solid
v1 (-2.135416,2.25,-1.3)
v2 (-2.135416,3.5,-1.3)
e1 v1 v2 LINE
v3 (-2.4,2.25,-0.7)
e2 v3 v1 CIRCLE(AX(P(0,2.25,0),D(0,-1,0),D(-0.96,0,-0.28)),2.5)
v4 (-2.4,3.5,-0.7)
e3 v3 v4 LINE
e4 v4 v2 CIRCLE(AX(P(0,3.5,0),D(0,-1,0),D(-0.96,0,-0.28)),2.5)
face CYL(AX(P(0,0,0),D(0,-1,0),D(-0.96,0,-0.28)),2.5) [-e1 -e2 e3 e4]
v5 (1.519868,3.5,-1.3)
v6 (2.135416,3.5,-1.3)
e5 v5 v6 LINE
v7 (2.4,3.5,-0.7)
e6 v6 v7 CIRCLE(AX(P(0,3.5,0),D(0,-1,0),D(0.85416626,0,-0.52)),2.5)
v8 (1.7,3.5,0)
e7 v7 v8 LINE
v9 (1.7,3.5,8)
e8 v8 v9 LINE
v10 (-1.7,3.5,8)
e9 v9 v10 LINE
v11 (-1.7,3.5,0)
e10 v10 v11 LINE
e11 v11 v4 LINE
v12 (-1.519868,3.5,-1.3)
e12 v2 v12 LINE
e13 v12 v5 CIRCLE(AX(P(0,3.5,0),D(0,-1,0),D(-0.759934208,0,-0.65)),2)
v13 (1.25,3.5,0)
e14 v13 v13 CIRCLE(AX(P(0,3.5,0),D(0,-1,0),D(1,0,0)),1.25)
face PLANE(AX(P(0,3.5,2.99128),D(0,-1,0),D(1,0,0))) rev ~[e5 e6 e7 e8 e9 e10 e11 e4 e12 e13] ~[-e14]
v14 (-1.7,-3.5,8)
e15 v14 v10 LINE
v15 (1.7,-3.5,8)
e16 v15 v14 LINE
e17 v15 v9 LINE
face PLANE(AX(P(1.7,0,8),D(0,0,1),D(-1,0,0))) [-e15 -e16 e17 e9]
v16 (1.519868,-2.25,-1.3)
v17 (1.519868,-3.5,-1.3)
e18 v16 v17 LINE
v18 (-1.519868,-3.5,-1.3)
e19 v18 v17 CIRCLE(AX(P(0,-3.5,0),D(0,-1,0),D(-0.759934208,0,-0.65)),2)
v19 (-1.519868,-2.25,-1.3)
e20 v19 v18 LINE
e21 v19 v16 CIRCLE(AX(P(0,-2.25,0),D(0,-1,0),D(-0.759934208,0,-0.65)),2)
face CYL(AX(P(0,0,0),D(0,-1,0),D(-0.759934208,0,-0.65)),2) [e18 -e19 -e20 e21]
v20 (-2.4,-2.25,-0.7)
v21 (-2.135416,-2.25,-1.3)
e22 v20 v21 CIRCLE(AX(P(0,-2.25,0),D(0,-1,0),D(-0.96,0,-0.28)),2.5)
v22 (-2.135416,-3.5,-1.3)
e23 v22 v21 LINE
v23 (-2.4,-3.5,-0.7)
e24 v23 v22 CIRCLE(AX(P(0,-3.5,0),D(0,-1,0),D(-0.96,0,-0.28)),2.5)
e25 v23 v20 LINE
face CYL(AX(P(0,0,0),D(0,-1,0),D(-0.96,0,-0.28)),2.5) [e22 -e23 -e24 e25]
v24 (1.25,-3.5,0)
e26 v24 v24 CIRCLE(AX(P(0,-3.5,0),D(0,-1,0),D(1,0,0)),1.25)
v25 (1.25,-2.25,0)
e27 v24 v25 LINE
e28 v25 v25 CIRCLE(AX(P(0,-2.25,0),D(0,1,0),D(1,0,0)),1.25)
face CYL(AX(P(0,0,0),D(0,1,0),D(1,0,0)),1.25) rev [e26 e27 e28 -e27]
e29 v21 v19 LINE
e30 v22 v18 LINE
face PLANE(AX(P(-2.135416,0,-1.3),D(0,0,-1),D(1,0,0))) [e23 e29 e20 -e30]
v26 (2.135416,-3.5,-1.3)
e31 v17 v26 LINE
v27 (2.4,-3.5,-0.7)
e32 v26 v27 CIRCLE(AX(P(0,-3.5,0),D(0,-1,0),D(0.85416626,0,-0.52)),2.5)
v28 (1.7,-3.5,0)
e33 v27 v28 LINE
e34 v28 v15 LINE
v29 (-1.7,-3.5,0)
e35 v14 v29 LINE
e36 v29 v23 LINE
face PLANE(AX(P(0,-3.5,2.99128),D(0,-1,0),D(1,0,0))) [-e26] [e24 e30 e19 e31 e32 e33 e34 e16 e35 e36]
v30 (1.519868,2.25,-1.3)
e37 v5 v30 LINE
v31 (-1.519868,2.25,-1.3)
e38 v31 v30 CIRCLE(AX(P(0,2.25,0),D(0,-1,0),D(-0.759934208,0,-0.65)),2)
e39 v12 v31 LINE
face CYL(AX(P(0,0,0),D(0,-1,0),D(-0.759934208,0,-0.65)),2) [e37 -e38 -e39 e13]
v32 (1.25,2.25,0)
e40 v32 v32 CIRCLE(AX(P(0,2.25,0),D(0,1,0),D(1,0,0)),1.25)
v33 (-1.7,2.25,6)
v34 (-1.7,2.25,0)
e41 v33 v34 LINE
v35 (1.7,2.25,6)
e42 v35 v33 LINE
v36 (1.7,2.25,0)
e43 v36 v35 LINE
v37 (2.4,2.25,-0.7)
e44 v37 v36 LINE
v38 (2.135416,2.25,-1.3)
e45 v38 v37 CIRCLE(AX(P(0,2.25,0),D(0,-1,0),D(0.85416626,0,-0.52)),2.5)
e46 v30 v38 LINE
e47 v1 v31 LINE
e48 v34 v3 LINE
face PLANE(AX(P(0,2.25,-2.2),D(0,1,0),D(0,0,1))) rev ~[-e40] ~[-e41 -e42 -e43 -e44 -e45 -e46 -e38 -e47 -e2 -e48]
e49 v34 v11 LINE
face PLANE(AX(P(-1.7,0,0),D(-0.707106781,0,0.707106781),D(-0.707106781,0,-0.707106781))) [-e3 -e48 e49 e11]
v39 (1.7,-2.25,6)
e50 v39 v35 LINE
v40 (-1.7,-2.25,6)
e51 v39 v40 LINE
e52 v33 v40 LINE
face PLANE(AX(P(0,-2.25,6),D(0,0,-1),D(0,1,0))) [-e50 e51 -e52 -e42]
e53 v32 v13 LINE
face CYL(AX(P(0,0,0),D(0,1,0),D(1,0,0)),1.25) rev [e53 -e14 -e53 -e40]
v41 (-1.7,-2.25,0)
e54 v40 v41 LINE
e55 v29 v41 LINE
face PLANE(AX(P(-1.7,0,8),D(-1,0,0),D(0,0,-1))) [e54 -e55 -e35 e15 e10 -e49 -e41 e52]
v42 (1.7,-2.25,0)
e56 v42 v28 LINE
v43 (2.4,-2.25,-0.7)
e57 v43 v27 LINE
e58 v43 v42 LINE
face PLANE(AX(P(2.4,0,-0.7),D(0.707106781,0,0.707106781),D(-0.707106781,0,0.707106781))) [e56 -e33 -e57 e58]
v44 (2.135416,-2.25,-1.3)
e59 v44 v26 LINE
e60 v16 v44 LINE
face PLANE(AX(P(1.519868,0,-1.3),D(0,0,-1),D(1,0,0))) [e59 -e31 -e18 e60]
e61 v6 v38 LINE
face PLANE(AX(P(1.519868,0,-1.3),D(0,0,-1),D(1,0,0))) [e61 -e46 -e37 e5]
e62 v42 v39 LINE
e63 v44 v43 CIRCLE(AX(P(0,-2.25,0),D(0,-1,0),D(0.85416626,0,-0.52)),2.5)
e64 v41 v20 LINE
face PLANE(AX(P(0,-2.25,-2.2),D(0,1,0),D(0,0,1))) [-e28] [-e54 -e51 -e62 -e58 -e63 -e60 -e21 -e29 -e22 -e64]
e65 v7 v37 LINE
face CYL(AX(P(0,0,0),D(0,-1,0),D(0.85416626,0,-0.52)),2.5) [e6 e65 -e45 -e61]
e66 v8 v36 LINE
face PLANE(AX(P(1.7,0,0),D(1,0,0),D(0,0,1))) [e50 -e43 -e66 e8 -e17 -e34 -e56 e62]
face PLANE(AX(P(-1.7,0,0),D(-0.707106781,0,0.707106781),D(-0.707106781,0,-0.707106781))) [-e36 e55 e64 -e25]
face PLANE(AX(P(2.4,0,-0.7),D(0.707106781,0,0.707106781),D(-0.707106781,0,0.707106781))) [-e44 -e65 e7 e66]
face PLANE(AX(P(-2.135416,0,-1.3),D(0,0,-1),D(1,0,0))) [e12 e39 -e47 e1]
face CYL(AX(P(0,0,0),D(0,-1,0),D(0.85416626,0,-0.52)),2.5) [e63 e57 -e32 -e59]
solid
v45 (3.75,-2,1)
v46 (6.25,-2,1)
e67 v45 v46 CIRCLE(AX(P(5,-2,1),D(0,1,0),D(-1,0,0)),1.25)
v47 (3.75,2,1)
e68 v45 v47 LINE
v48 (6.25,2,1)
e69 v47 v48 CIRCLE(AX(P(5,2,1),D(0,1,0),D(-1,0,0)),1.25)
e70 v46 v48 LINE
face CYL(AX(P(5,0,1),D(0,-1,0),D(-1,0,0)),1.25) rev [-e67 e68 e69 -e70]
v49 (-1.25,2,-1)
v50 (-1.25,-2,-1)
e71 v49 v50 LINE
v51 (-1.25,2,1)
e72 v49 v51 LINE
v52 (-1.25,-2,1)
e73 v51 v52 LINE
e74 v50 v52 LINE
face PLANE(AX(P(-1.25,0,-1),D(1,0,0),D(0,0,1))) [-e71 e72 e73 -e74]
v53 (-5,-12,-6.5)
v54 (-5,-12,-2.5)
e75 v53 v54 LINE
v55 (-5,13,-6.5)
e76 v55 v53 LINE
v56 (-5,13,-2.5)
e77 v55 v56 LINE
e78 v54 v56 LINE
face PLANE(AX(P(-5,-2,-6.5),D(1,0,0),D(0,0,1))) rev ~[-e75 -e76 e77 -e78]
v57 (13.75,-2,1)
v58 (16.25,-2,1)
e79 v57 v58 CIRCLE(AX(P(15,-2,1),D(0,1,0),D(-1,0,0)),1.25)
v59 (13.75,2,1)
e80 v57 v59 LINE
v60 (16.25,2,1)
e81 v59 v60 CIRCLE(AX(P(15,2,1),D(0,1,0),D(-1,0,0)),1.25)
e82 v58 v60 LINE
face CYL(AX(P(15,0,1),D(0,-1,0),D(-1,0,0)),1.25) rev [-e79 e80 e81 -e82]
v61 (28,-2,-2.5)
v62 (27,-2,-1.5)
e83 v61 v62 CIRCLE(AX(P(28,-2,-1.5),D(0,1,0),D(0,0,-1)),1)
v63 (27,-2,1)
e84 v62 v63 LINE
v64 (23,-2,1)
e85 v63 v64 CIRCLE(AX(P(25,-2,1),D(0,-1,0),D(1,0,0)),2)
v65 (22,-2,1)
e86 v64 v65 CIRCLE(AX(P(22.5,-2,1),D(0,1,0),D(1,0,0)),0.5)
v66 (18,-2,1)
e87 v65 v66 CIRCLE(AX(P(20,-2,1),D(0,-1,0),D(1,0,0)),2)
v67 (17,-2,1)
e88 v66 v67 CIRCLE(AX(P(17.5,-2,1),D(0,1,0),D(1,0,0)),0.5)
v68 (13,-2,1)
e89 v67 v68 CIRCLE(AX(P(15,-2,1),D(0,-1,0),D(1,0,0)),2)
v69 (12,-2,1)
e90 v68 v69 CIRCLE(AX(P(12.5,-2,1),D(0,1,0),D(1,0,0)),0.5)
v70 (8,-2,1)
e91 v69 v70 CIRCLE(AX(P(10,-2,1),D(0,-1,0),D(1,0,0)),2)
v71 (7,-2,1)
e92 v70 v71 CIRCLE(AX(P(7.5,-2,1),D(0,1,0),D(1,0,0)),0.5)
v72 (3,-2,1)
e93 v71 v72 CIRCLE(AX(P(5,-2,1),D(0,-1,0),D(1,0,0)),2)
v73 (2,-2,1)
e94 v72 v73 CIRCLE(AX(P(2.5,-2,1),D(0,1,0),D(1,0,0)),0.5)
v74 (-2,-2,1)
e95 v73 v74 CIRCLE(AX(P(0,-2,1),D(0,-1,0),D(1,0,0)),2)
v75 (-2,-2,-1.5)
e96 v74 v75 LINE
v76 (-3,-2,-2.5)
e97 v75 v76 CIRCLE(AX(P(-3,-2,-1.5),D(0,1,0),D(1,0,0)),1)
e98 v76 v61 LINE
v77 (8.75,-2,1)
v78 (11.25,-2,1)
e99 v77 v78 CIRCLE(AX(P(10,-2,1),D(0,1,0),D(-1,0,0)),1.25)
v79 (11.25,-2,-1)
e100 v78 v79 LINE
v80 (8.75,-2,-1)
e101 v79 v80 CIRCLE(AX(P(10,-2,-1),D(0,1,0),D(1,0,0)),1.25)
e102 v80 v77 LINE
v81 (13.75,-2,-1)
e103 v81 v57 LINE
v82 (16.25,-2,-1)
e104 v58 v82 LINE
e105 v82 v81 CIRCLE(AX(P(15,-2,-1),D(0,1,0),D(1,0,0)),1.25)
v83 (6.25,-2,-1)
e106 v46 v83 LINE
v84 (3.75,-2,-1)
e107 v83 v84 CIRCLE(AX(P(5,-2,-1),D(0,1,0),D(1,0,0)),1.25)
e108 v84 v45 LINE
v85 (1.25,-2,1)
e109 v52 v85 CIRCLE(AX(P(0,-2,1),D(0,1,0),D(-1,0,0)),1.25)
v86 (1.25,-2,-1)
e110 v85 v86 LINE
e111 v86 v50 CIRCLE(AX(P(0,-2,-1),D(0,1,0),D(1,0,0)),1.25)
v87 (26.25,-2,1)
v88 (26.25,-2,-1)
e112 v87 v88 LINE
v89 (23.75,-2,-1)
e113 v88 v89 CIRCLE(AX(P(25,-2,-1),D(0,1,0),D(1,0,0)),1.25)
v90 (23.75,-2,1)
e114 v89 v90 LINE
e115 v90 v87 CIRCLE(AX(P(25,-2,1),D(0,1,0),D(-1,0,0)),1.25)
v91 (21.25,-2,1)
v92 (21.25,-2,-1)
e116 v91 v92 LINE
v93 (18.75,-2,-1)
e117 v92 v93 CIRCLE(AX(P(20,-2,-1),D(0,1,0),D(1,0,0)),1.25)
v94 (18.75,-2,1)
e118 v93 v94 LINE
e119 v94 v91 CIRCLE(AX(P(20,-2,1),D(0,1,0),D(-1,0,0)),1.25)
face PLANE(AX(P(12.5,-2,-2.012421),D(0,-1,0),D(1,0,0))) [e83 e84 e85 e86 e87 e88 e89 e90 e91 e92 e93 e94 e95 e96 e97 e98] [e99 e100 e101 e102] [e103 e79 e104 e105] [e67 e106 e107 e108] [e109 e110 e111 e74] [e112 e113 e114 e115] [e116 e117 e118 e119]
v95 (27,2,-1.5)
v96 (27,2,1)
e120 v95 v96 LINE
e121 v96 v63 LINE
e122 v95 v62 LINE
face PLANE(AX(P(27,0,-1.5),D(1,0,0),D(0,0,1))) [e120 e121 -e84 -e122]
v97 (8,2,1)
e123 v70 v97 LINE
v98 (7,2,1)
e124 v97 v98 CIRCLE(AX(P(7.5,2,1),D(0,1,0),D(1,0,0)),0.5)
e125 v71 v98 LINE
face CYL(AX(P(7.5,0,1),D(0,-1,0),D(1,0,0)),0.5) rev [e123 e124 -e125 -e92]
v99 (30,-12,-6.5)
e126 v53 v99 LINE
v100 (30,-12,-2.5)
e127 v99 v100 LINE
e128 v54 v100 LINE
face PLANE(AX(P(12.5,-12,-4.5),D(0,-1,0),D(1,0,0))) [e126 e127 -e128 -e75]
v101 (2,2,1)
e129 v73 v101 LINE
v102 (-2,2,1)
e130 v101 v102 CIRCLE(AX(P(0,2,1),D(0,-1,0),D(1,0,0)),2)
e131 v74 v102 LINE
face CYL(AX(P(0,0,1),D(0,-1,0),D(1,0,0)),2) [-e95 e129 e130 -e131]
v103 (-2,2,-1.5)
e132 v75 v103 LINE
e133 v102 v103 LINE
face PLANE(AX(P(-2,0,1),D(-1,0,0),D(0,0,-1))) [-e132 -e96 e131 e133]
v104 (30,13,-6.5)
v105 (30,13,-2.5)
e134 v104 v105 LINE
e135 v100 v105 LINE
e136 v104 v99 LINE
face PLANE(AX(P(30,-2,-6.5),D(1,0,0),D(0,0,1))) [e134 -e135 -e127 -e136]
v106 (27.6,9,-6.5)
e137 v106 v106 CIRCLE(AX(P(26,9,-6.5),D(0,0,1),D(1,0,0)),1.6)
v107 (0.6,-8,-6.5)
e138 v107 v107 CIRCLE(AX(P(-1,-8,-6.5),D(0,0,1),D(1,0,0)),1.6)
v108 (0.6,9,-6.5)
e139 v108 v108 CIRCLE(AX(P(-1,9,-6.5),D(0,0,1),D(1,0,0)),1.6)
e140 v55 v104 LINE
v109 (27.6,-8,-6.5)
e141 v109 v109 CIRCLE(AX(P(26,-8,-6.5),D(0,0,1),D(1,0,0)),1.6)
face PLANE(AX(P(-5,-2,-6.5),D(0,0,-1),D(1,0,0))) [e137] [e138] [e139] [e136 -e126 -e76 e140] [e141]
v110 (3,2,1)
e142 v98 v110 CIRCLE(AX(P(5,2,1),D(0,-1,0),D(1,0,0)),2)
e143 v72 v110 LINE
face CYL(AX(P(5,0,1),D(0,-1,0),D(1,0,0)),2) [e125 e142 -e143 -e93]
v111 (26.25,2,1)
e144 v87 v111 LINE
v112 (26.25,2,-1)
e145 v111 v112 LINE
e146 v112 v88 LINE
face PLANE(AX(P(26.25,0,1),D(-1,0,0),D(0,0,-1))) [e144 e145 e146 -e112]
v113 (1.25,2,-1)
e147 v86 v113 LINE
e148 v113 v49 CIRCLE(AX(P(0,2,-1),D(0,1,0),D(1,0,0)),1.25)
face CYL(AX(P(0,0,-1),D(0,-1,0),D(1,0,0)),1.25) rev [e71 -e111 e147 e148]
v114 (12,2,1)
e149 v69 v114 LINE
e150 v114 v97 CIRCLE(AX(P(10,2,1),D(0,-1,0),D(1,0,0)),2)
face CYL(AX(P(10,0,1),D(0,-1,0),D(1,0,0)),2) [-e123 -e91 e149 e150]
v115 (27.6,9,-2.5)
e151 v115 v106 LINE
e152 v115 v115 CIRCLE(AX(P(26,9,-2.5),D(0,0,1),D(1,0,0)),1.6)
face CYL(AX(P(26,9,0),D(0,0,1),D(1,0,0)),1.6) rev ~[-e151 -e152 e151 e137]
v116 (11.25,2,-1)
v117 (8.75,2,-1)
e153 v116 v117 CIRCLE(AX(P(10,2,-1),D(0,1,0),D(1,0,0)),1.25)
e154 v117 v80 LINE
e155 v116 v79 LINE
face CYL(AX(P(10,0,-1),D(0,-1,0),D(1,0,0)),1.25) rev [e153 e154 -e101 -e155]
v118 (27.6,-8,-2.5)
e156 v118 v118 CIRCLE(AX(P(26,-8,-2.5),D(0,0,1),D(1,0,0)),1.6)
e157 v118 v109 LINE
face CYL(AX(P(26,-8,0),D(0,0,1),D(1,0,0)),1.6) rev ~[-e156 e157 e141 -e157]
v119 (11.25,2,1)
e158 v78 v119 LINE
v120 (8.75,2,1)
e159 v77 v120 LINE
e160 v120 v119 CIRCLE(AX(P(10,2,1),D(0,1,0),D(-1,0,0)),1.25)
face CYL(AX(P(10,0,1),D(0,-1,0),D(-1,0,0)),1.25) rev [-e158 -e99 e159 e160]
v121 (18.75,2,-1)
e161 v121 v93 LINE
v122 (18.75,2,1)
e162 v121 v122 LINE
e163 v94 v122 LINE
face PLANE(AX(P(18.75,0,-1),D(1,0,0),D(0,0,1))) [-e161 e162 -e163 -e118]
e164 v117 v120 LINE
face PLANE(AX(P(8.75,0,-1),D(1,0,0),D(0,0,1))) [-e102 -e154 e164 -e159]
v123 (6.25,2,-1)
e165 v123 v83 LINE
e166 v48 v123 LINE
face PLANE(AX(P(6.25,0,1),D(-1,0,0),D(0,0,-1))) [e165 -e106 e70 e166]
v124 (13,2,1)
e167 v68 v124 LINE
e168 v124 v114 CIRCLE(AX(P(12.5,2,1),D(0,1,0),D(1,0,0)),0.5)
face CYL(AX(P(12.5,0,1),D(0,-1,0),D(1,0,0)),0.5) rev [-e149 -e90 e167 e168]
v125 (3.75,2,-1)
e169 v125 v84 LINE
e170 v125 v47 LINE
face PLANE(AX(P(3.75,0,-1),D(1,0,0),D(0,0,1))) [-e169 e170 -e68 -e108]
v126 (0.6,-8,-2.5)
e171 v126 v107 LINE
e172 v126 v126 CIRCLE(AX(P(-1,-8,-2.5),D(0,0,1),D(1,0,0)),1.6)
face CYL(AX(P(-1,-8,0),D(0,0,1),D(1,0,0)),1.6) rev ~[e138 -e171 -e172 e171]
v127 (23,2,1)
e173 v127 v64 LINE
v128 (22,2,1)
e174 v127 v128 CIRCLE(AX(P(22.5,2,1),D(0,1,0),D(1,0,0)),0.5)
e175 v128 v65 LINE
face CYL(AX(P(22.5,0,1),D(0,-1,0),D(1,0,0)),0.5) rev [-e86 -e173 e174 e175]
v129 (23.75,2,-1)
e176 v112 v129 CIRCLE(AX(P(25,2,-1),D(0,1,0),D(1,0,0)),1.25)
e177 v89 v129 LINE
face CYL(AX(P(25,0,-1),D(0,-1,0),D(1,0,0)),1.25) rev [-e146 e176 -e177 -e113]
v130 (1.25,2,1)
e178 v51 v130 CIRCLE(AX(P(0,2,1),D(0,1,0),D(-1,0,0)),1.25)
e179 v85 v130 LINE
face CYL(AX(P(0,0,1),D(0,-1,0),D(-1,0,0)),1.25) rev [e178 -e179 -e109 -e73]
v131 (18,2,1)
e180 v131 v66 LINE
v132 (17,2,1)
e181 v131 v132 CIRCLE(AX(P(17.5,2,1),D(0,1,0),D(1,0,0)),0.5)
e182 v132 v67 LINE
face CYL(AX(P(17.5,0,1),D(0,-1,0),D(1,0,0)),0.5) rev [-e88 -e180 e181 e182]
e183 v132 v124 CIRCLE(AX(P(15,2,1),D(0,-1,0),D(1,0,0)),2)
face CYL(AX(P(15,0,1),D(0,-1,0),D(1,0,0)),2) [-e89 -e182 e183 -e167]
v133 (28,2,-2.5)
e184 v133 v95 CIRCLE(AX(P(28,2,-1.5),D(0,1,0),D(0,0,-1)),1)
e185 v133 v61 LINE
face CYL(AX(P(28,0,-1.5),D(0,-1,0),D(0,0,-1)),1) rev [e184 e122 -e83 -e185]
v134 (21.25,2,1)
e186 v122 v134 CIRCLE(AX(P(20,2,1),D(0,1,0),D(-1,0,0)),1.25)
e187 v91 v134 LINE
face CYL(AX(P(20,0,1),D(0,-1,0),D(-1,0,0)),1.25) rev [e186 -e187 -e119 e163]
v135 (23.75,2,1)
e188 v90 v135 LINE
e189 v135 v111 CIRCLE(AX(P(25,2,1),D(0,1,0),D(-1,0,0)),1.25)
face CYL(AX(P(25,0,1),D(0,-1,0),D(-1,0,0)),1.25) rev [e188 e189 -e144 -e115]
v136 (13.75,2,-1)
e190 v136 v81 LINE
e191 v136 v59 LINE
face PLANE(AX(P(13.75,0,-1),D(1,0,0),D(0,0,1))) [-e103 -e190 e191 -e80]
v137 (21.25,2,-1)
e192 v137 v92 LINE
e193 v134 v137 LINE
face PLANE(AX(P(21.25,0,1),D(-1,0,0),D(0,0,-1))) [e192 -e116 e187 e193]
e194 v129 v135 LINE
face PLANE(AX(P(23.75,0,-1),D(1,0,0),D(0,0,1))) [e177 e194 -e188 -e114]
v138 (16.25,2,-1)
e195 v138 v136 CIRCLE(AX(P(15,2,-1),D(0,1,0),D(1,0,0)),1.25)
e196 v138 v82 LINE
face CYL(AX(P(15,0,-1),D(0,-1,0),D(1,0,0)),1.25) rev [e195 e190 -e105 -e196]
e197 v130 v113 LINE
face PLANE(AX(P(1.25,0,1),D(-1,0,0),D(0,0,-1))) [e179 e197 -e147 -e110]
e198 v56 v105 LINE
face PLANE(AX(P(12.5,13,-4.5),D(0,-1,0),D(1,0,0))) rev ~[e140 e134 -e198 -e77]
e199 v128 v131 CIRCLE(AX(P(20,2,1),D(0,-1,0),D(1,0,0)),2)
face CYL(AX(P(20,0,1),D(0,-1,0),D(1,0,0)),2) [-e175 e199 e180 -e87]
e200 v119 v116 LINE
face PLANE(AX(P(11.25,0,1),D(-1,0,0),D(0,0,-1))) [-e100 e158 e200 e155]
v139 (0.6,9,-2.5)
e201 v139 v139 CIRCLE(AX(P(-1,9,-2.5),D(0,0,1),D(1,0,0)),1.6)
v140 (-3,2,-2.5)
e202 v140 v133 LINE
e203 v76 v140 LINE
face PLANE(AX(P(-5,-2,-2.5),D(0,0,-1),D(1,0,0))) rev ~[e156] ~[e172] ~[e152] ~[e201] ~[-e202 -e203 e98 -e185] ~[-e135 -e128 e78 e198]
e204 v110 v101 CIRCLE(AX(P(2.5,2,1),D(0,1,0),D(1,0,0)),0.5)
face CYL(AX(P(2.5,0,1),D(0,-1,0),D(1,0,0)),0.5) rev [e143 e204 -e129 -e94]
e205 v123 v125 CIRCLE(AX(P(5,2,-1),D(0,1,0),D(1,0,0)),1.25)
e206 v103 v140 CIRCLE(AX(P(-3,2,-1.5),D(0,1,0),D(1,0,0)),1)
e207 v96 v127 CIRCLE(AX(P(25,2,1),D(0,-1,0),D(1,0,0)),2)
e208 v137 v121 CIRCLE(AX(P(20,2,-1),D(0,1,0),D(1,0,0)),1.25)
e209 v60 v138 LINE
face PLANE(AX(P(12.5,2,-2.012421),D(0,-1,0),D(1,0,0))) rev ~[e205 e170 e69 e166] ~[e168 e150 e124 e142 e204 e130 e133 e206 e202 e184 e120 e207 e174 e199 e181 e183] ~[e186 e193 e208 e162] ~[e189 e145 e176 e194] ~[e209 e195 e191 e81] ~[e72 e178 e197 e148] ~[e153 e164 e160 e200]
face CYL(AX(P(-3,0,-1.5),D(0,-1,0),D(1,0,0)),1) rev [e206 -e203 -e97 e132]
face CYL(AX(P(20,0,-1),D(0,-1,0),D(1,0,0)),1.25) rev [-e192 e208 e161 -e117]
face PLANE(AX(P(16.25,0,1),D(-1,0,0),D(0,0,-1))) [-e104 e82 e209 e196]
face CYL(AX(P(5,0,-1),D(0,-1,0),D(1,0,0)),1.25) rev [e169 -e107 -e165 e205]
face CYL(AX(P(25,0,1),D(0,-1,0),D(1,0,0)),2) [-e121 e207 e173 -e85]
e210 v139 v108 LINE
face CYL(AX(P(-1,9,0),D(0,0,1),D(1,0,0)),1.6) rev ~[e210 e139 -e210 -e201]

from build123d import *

# Parameters (mm, degrees)
F1_DEPTH      = 2
F2_W          = 35
F2_H          = 4
F3_DEPTH      = 10
F3_DEPTH_BACK = 15
F4_R          = 1.6
F5_DEPTH      = 6.5
F6_R          = 1.25
F7_DEPTH      = 3.5
F8_W          = 4.5
F8_H          = 8.2
F9_DEPTH      = 12.5


with BuildPart() as f1:
    # F0 (on Front) → F1 (new body, symmetric)
    with BuildSketch(Plane.XZ):
        with BuildLine():
            Line((-5, -2.5), (-5, -6.5))
            Line((-5, -6.5), (30, -6.5))
            Line((30, -6.5), (30, -2.5))
            Line((30, -2.5), (28, -2.5))
            ThreePointArc((28, -2.5), (27.2928932188, -2.2071067812), (27, -1.5))
            Line((27, -1.5), (27, 1))
            ThreePointArc((27, 1), (25, 3), (23, 1))
            ThreePointArc((23, 1), (22.5, 0.5), (22, 1))
            ThreePointArc((22, 1), (20, 3), (18, 1))
            ThreePointArc((18, 1), (17.5, 0.5), (17, 1))
            ThreePointArc((17, 1), (15, 3), (13, 1))
            ThreePointArc((13, 1), (12.5, 0.5), (12, 1))
            ThreePointArc((12, 1), (10, 3), (8, 1))
            ThreePointArc((8, 1), (7.5, 0.5), (7, 1))
            ThreePointArc((7, 1), (5, 3), (3, 1))
            ThreePointArc((3, 1), (2.5, 0.5), (2, 1))
            ThreePointArc((2, 1), (0, 3), (-2, 1))
            Line((-2, 1), (-2, -1.5))
            ThreePointArc((-2, -1.5), (-2.2928932188, -2.2071067812), (-3, -2.5))
            Line((-3, -2.5), (-5, -2.5))
        make_face()
        with BuildLine():
            Line((-1.25, -1), (-1.25, 1))
            ThreePointArc((-1.25, 1), (0, 2.25), (1.25, 1))
            Line((1.25, 1), (1.25, -1))
            ThreePointArc((1.25, -1), (0, -2.25), (-1.25, -1))
        make_face(mode=Mode.SUBTRACT)
        with BuildLine():
            ThreePointArc((6.25, -1), (5, -2.25), (3.75, -1))
            Line((3.75, -1), (3.75, 1))
            ThreePointArc((3.75, 1), (5, 2.25), (6.25, 1))
            Line((6.25, 1), (6.25, -1))
        make_face(mode=Mode.SUBTRACT)
        with BuildLine():
            ThreePointArc((11.25, -1), (10, -2.25), (8.75, -1))
            Line((8.75, -1), (8.75, 1))
            ThreePointArc((8.75, 1), (10, 2.25), (11.25, 1))
            Line((11.25, 1), (11.25, -1))
        make_face(mode=Mode.SUBTRACT)
        with BuildLine():
            ThreePointArc((16.25, -1), (15, -2.25), (13.75, -1))
            Line((13.75, -1), (13.75, 1))
            ThreePointArc((13.75, 1), (15, 2.25), (16.25, 1))
            Line((16.25, 1), (16.25, -1))
        make_face(mode=Mode.SUBTRACT)
        with BuildLine():
            ThreePointArc((21.25, -1), (20, -2.25), (18.75, -1))
            Line((18.75, -1), (18.75, 1))
            ThreePointArc((18.75, 1), (20, 2.25), (21.25, 1))
            Line((21.25, 1), (21.25, -1))
        make_face(mode=Mode.SUBTRACT)
        with BuildLine():
            ThreePointArc((26.25, -1), (25, -2.25), (23.75, -1))
            Line((23.75, -1), (23.75, 1))
            ThreePointArc((23.75, 1), (25, 2.25), (26.25, 1))
            Line((26.25, 1), (26.25, -1))
        make_face(mode=Mode.SUBTRACT)
    extrude(amount=F1_DEPTH, both=True)

    # F2 (on face) → F3 (join, two sides)
    with BuildSketch(Plane.XZ.offset(2)) as f3_sk:
        with Locations((12.5, -4.5)):
            Rectangle(F2_W, F2_H)
    extrude(amount=F3_DEPTH)
    extrude(f3_sk.sketch, amount=-F3_DEPTH_BACK)

    # F4 (on Top) → F5 (cut, through all)
    with BuildSketch(Plane.XY):
        with Locations((-1, 9)):
            Circle(F4_R)
        with Locations((26, 9)):
            Circle(F4_R)
        with Locations((26, -8)):
            Circle(F4_R)
        with Locations((-1, -8)):
            Circle(F4_R)
    extrude(amount=-F5_DEPTH, mode=Mode.SUBTRACT)


with BuildPart() as f7:
    # F6 (on Front) → F7 (new body, symmetric)
    with BuildSketch(Plane.XZ):
        with BuildLine():
            Line((-2.1354156504, -1.3), (-1.5198684154, -1.3))
            ThreePointArc((-1.5198684154, -1.3), (0, -2), (1.5198684154, -1.3))
            Line((1.5198684154, -1.3), (2.1354156504, -1.3))
            ThreePointArc((2.1354156504, -1.3), (2.2874655802, -1.0087126546), (2.4, -0.7))
            Line((2.4, -0.7), (1.7, 0))
            Line((1.7, 0), (1.7, 8))
            Line((1.7, 8), (-1.7, 8))
            Line((-1.7, 8), (-1.7, 0))
            Line((-1.7, 0), (-2.4, -0.7))
            ThreePointArc((-2.4, -0.7), (-2.2874655802, -1.0087126546), (-2.1354156504, -1.3))
        make_face()
        Circle(F6_R, mode=Mode.SUBTRACT)
    extrude(amount=F7_DEPTH, both=True)

    # F8 (on Right) → F9 (cut, symmetric)
    with BuildSketch(Plane.YZ):
        with Locations((0, 1.9)):
            Rectangle(F8_W, F8_H)
    extrude(amount=F9_DEPTH, both=True, mode=Mode.SUBTRACT)


solid = Compound([f1.part, f7.part])
